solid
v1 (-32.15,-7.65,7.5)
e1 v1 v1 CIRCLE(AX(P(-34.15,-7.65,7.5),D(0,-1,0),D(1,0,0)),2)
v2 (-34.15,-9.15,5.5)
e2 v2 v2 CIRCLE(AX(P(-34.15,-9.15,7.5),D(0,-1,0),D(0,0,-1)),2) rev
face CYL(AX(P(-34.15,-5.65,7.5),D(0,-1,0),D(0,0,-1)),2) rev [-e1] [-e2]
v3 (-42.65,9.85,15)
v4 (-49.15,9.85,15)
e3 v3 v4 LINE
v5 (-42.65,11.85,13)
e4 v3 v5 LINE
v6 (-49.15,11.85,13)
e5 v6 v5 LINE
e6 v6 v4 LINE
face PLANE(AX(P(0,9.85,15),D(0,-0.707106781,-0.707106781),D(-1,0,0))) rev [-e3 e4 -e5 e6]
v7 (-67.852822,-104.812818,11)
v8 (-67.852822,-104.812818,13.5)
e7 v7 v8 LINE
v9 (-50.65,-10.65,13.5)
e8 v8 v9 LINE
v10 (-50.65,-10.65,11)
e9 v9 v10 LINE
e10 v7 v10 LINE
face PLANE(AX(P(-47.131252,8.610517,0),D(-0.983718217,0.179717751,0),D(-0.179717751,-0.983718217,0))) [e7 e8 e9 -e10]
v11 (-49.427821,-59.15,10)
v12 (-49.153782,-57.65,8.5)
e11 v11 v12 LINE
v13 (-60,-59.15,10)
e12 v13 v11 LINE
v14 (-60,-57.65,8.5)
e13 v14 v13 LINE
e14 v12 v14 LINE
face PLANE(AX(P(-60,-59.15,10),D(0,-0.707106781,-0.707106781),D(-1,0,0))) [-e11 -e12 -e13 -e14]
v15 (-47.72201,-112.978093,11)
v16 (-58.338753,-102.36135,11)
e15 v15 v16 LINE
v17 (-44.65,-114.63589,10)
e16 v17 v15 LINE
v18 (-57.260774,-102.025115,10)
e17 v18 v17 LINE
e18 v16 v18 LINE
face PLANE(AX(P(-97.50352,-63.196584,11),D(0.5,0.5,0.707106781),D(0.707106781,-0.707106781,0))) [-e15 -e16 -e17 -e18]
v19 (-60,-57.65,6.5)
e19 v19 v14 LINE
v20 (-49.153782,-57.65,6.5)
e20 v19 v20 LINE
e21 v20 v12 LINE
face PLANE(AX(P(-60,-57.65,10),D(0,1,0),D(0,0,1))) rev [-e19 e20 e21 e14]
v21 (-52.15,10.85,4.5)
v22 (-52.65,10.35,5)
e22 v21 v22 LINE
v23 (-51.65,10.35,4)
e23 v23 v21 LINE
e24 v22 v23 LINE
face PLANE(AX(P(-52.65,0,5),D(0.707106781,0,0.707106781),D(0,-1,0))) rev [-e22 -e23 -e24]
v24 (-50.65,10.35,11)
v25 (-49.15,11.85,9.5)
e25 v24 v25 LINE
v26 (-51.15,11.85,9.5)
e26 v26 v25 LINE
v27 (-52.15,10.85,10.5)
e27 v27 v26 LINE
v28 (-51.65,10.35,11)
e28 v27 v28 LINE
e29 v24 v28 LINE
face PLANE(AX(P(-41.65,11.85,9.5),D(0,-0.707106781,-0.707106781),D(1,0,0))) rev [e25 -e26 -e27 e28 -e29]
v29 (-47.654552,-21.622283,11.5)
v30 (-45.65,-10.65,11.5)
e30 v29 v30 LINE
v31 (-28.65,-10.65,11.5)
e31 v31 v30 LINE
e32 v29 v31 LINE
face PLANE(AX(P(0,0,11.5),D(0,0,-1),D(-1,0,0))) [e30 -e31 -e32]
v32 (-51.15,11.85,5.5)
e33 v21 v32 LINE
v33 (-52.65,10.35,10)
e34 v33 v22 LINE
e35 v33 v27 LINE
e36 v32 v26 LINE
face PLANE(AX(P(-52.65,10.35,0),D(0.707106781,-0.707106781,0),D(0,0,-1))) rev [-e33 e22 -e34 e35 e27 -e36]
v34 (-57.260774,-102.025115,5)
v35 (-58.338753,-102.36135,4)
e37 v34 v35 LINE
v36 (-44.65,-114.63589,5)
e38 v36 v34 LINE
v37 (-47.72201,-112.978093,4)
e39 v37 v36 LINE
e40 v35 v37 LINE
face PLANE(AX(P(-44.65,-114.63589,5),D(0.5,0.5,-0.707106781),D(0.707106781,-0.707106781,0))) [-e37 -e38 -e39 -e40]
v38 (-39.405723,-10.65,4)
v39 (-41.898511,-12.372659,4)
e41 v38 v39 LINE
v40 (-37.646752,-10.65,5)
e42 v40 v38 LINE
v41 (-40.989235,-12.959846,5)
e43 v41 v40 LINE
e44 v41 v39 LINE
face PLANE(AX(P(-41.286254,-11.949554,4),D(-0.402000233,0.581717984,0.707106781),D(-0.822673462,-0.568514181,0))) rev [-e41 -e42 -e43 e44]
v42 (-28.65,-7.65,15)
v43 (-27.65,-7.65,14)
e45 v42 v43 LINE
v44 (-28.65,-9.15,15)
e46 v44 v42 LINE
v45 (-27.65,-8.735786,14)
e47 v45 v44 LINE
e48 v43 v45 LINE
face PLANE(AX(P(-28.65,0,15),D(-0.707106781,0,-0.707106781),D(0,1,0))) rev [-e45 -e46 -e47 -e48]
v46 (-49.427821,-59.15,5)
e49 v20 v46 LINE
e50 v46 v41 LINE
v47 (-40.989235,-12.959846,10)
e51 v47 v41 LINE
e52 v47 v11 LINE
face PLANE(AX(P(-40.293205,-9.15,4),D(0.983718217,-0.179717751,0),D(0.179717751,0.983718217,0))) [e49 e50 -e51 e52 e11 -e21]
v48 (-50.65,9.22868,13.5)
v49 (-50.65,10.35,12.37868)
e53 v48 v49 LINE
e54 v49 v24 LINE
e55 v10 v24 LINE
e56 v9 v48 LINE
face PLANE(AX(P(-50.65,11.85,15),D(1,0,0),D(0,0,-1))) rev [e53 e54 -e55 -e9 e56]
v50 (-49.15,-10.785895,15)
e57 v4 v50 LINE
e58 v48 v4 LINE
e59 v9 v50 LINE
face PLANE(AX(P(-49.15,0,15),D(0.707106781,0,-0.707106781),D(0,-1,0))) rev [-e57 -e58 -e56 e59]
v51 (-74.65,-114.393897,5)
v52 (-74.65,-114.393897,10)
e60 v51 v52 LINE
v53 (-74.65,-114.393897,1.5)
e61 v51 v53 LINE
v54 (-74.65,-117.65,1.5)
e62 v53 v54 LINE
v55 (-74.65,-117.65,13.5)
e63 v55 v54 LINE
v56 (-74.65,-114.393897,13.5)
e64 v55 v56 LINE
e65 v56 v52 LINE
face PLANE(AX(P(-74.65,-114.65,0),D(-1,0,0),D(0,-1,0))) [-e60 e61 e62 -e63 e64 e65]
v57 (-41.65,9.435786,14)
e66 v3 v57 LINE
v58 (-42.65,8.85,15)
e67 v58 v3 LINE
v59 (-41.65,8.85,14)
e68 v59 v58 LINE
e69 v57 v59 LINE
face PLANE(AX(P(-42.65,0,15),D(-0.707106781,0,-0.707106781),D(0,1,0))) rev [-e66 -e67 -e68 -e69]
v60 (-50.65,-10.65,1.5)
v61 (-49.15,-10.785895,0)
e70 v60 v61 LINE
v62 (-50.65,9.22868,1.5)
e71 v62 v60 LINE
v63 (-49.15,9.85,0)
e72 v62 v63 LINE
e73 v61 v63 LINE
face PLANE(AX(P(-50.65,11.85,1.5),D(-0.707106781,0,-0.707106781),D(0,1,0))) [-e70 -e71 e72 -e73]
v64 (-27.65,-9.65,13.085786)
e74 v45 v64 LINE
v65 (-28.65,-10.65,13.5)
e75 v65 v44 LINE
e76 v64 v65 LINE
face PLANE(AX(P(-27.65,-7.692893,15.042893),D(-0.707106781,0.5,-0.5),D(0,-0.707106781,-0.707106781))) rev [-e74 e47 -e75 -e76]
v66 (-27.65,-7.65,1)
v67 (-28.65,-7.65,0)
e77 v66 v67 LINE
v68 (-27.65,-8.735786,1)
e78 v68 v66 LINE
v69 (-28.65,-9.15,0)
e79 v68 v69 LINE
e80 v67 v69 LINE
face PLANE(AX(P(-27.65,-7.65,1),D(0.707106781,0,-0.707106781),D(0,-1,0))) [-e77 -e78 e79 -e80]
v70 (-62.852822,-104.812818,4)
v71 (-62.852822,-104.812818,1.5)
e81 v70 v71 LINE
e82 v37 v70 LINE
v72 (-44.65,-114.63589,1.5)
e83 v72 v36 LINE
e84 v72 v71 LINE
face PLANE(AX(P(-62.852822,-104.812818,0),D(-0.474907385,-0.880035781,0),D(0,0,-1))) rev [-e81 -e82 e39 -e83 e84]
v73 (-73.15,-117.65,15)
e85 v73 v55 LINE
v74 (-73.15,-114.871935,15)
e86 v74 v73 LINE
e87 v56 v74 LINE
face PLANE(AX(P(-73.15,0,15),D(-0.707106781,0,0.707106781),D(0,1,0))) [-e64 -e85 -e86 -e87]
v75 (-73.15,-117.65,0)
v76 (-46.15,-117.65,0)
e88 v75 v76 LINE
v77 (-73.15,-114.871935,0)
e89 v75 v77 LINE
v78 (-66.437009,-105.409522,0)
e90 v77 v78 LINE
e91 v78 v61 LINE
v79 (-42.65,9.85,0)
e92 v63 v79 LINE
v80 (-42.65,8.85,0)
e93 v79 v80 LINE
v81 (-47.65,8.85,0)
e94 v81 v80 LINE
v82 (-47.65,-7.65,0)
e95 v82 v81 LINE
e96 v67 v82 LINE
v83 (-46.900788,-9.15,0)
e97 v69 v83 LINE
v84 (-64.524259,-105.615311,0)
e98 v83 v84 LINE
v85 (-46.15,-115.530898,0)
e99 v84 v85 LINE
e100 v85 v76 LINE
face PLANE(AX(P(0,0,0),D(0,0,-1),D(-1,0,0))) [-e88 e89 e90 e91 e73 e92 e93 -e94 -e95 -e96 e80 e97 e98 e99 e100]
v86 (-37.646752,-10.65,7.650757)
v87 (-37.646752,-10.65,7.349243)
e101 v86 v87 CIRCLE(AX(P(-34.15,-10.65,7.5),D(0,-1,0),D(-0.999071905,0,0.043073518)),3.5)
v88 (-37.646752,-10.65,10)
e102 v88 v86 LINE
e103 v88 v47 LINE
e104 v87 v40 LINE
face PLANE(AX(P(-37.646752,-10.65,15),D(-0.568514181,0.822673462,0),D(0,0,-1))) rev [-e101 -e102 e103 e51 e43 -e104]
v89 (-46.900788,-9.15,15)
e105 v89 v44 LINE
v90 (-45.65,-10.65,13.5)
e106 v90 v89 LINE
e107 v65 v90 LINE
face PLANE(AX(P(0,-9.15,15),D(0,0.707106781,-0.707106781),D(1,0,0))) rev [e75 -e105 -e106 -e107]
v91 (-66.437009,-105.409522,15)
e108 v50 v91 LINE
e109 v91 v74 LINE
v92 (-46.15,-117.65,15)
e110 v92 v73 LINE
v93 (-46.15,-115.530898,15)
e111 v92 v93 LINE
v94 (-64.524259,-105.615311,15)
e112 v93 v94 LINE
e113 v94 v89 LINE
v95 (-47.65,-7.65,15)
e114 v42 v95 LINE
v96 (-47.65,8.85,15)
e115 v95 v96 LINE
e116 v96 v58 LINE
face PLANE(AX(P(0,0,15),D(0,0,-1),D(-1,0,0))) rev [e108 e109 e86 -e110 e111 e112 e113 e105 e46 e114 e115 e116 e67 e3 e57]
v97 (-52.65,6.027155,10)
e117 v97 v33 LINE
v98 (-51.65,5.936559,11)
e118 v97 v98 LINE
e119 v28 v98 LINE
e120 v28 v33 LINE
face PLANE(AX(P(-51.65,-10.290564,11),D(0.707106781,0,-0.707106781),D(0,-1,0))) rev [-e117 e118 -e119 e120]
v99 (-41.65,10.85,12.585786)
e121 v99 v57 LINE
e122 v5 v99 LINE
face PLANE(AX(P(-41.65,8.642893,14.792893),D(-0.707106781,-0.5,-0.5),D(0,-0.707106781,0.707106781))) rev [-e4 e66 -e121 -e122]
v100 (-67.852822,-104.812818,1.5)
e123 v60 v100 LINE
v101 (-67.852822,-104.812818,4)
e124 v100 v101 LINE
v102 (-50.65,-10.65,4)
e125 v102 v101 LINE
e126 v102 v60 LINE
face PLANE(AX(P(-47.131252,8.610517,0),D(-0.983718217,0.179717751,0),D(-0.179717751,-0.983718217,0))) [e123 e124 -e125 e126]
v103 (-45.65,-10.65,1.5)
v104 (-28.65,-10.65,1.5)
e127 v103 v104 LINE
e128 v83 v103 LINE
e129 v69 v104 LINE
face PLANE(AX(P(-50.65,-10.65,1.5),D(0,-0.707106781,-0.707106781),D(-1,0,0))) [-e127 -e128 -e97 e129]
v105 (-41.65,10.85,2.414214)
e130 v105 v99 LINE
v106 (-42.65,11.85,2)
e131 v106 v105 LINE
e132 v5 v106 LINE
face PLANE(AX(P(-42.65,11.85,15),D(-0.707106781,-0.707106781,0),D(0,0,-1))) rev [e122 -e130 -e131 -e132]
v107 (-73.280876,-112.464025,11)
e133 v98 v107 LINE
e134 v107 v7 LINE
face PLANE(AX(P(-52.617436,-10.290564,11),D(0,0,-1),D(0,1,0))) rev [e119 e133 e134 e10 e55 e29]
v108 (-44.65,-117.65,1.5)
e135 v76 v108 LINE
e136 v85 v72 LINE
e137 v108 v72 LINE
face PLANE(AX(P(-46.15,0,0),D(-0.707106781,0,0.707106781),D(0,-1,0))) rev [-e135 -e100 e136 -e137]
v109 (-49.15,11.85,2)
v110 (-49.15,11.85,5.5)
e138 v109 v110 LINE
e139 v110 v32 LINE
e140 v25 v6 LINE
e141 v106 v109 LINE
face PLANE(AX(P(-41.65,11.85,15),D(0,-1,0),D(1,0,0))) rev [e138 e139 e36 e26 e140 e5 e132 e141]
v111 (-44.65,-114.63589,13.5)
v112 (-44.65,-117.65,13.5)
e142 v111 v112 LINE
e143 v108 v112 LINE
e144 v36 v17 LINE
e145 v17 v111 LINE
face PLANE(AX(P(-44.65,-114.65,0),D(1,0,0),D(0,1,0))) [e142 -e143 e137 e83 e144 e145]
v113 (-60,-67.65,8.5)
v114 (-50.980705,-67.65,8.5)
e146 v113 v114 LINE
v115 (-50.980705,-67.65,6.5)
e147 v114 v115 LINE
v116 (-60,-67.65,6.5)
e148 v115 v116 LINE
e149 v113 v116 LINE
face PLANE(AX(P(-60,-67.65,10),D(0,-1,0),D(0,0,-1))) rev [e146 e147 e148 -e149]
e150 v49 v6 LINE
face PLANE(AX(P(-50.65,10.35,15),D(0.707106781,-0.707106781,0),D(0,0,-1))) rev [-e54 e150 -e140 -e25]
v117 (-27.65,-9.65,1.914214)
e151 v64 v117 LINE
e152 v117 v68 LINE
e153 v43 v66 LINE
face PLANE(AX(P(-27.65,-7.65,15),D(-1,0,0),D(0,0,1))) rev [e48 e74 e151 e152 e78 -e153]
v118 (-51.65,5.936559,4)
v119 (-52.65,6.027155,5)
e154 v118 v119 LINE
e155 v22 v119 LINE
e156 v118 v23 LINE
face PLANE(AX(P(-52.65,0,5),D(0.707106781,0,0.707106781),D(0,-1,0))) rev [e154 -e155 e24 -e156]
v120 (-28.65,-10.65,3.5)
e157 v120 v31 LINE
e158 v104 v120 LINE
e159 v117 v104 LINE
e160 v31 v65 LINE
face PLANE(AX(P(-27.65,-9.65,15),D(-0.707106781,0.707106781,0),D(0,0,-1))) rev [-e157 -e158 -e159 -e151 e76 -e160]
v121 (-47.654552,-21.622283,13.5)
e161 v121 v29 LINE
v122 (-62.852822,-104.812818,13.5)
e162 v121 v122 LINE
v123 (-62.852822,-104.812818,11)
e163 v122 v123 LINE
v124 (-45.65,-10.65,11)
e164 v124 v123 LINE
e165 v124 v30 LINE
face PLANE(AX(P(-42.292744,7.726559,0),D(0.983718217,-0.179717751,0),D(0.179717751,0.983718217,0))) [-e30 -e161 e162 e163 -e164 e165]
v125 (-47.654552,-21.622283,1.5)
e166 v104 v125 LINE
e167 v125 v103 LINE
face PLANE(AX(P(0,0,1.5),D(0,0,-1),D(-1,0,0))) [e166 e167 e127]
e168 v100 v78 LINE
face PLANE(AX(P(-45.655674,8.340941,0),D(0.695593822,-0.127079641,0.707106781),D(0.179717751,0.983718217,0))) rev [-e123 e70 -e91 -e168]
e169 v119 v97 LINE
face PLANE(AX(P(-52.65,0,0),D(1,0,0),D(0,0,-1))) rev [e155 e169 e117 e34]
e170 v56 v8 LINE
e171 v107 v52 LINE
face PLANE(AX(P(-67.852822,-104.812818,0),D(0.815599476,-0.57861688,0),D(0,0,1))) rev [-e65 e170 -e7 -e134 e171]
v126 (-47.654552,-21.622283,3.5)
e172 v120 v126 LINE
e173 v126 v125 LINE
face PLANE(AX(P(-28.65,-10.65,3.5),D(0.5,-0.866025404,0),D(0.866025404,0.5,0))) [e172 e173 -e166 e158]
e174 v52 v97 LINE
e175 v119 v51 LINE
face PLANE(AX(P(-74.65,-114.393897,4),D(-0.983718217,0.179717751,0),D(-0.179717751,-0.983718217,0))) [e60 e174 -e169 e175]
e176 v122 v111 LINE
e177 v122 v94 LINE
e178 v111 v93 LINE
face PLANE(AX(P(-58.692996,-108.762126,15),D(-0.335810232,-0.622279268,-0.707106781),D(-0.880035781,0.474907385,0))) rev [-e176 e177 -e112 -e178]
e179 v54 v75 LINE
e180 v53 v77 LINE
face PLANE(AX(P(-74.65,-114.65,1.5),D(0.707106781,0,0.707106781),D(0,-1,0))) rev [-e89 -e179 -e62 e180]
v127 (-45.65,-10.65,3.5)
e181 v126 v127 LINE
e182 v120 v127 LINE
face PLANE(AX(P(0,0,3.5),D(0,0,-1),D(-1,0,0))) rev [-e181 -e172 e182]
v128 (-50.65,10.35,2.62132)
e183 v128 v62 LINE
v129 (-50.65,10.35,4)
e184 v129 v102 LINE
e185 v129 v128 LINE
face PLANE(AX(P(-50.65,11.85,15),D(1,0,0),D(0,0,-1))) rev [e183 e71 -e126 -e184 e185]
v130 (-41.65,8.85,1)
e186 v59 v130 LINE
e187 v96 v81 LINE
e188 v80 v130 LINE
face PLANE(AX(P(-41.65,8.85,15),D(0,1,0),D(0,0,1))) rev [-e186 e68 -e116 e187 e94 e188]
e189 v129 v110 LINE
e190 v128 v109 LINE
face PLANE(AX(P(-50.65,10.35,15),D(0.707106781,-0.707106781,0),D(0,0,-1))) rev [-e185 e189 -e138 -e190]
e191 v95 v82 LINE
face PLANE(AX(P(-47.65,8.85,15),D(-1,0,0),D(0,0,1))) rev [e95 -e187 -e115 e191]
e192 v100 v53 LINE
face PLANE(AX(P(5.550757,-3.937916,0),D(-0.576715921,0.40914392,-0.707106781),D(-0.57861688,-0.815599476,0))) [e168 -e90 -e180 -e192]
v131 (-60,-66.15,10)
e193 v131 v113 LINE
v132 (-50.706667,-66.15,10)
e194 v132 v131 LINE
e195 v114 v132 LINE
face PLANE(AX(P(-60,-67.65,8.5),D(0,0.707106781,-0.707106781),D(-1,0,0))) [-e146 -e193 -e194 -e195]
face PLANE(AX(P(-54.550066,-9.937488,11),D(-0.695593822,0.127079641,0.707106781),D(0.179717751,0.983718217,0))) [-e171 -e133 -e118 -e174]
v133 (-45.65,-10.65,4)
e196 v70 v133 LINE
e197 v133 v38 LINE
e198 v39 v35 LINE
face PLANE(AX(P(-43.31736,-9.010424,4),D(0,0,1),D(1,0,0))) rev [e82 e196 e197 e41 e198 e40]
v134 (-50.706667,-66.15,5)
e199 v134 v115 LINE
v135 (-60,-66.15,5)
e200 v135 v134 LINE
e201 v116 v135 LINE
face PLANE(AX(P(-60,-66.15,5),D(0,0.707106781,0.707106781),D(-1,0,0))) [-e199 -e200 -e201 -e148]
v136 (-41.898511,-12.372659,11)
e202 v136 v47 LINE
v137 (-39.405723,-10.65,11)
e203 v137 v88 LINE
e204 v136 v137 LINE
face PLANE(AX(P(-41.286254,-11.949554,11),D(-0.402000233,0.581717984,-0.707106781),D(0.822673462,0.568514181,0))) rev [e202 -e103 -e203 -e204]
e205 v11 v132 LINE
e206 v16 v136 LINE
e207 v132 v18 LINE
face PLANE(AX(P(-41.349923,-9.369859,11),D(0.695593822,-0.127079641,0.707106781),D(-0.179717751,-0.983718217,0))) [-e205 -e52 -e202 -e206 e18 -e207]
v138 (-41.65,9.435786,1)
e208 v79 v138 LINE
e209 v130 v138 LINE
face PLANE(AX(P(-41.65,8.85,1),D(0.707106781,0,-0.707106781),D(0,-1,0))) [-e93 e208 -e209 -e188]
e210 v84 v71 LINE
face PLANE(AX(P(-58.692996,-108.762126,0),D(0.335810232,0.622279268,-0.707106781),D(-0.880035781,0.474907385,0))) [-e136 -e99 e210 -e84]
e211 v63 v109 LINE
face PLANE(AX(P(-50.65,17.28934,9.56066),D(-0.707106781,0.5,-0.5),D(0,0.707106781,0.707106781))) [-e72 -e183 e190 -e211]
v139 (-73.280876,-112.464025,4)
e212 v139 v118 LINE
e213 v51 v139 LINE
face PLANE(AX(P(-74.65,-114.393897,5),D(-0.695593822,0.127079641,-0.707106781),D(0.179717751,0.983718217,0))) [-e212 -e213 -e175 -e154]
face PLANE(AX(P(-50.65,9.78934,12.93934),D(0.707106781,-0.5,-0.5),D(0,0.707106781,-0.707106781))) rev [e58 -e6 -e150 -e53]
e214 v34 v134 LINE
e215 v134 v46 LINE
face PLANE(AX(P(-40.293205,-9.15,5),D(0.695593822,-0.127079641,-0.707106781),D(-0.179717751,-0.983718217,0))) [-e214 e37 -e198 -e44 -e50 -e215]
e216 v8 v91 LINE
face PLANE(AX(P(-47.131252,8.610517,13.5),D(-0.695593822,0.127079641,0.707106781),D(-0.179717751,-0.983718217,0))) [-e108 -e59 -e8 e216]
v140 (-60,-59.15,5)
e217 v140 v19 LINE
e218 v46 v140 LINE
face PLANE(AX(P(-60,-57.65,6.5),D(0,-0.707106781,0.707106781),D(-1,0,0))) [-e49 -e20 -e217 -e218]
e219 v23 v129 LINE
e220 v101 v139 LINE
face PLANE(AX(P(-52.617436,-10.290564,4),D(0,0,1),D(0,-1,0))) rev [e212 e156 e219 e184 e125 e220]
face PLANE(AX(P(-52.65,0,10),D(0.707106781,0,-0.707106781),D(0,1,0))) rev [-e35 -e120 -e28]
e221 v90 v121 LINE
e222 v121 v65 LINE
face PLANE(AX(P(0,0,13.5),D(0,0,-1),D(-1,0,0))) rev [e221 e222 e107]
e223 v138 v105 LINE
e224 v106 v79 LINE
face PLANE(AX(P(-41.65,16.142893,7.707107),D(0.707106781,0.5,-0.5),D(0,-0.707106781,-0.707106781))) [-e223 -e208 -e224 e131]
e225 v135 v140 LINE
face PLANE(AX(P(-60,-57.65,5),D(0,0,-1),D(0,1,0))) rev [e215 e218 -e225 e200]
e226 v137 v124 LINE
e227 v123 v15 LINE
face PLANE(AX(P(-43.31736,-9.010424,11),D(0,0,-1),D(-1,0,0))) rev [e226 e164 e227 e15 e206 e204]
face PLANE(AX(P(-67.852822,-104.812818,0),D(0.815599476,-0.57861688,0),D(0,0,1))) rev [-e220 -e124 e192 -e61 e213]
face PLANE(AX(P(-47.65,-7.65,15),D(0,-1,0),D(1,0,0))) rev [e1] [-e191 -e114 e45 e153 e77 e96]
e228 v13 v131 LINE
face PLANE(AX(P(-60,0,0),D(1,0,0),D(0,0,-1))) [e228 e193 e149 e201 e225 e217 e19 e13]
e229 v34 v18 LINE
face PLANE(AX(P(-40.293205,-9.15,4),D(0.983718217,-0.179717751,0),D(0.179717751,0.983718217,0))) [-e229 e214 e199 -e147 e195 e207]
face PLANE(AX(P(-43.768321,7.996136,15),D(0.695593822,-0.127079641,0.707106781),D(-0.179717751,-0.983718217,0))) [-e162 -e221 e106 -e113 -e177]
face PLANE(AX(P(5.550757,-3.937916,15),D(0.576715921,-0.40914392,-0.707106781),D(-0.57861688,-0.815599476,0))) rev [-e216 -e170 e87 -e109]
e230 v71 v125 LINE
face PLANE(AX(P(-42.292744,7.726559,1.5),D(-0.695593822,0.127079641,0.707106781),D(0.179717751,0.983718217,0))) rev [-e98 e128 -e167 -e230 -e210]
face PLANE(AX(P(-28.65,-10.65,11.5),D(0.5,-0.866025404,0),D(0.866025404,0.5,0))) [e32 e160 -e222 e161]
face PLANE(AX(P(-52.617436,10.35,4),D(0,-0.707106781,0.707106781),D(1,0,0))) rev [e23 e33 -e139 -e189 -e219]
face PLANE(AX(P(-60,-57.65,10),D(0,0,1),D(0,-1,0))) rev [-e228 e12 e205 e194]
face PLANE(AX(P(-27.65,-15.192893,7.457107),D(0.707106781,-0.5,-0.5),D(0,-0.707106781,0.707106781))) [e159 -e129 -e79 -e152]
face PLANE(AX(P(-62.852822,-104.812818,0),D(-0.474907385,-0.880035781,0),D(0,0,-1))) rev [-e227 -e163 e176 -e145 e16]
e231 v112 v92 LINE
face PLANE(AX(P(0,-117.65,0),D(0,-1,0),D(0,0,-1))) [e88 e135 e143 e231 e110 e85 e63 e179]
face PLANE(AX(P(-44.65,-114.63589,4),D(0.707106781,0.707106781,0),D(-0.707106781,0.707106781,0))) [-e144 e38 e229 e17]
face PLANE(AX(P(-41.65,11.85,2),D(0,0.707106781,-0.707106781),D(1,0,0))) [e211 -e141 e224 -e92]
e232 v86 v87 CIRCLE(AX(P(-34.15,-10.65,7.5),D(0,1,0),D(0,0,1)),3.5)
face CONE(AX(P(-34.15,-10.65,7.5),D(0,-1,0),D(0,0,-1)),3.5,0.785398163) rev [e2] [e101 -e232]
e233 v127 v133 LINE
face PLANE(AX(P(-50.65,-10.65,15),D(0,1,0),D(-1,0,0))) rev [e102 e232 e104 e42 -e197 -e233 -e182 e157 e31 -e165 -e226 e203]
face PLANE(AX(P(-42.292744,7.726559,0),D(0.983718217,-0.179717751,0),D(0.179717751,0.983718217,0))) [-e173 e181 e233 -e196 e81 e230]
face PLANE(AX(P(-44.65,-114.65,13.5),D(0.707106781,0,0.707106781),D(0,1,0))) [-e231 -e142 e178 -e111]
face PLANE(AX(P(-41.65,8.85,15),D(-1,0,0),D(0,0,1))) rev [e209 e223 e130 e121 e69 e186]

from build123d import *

# Parameters (mm, degrees)
RESSALTO_EXTRUS_O1_DEPTH  = 15
ESBO_O7_W                 = 30
ESBO_O7_H                 = 15
RESSALTO_EXTRUS_O3_DEPTH  = 3
ESBO_O14_W                = 7
ESBO_O14_H                = 107.753429602
RESSALTO_EXTRUS_O5_DEPTH  = 2
ESBO_O15_W                = 7
ESBO_O15_H                = 107.852923352
RESSALTO_EXTRUS_O6_DEPTH  = 2
ESBO_O16_W                = 7
ESBO_O16_H                = 22.5
RESSALTO_EXTRUS_O9_DEPTH  = 2
CHANFRO11_SIZE            = 20.026147127
CHANFRO11_SIZE_2          = 10
CHANFRO12_SIZE            = 5.181688732
CHANFRO12_SIZE_2          = 10
CHANFRO13_SIZE            = 2
CHANFRO14_SIZE            = 4.8
CHANFRO14_SIZE2           = 5.970145796
CHANFRO16_SIZE            = 1.5
CHANFRO17_SIZE            = 1.5
CHANFRO18_SIZE            = 1
ESBO_O17_R                = 2
CORTE_EXTRUS_O1_DEPTH     = 5
CHANFRO20_SIZE            = 1
RESSALTO_EXTRUS_O10_DEPTH = 7
RESSALTO_EXTRUS_O11_DEPTH = 2
RESSALTO_EXTRUS_O13_DEPTH = 2
ESBO_O23_W                = 5
ESBO_O23_H                = 10
CORTE_EXTRUS_O2_DEPTH     = 60
CHANFRO22_SIZE            = 1.5
CHANFRO21_SIZE            = 1


# Some blends are built 0.0001 mm under size
with BuildPart() as part:
    # Esboço2 → Ressalto-extrusão1 (new body)
    with BuildSketch(Plane.XY):
        Polygon((-41.65, 8.85), (-41.65, 11.85), (-50.65, 11.85), (-50.65, -10.65), (-27.65, -10.65), (-27.65, -7.65), (-47.65, -7.65), (-47.65, 8.85), align=None)
    extrude(amount=RESSALTO_EXTRUS_O1_DEPTH)



with BuildPart() as body_2:
    # Esboço7 → Ressalto-extrusão3 (new body)
    with BuildSketch(Plane(origin=(0, -117.65, 0), x_dir=(-1, 0, 0), z_dir=(0, -1, 0))):
        with Locations((59.65, -7.5)):
            Rectangle(ESBO_O7_W, ESBO_O7_H)
    extrude(amount=-RESSALTO_EXTRUS_O3_DEPTH)


with BuildPart() as part_1:
    add(part.part)

    add(body_2.part)  # Loft3 merges body 2
    # Esboço9 → Loft3 section 0
    with BuildSketch(Plane(origin=(0, -114.65, 0), x_dir=(1, 0, 0), z_dir=(0, 1, 0))):
        with BuildLine():
            Line((-69.65, -15), (-64.65, -15))
            Line((-64.65, -15), (-64.65, 0))
            Line((-64.65, 0), (-69.65, 0))
            Line((-69.65, 0), (-69.65, -15))
        make_face()
    # Esboço8 → Loft3 section 1
    with BuildSketch(Plane.XZ.offset(10.65)):
        with BuildLine():
            Line((-50.65, 15), (-45.65, 15))
            Line((-45.65, 15), (-45.65, 0))
            Line((-45.65, 0), (-50.65, 0))
            Line((-50.65, 0), (-50.65, 15))
        make_face()
    loft()

    # Esboço14 → Ressalto-extrusão5 (add)
    with BuildSketch(Plane(origin=(-42.292744028, 7.726559005, 0), x_dir=(0, 0, -1), z_dir=(0.9837182167305484, -0.17971775113346497, 0))):
        with Locations((-7.5, -70.525331358)):
            Rectangle(ESBO_O14_W, ESBO_O14_H)
    extrude(amount=RESSALTO_EXTRUS_O5_DEPTH)

    # Esboço15 → Ressalto-extrusão6 (add)
    with BuildSketch(Plane(origin=(-47.131251678, 8.610517133, 0), x_dir=(0, 0, 1), z_dir=(-0.9837182167305483, 0.17971775113346522, 0))):
        with Locations((7.5, -73.505764779)):
            Rectangle(ESBO_O15_W, ESBO_O15_H)
    extrude(amount=RESSALTO_EXTRUS_O6_DEPTH)

    # Esboço16 → Ressalto-extrusão9 (add)
    with BuildSketch(Plane.ZY.offset(50.65)):
        with Locations((7.5, 0.6)):
            Rectangle(ESBO_O16_W, ESBO_O16_H)
    extrude(amount=RESSALTO_EXTRUS_O9_DEPTH)

    # Chanfro11
    # the kernel refuses this chamfer: 20.026147127, 10 mm, written as the material it adds along each edge
    with BuildSketch(Plane(origin=(-64.65, -114.65, 55.83646579), x_dir=(0.9998316750706326, -0.018347248443652868, 0), z_dir=(0, 0, -1))) as chanfro11_piece_1_section:
        Polygon((CHANFRO11_SIZE * 0.999831675085, -CHANFRO11_SIZE * 0.0183472484439), (CHANFRO11_SIZE_2 * 0.161638977635, -CHANFRO11_SIZE_2 * 0.986849958661), (0, 0), align=None)
    chanfro11_piece_1 = extrude(amount=55.83646579, mode=Mode.PRIVATE)
    chanfro11_piece_1 = split(chanfro11_piece_1, bisect_by=Plane(origin=(-44.65, -111.70383057, 13), z_dir=(-1, 0, 0)), keep=Keep.TOP, mode=Mode.PRIVATE)
    chanfro11_piece_1 = split(chanfro11_piece_1, bisect_by=Plane(origin=(-56.081001228, -111.70383057, 15), z_dir=(0, 0, -1)), keep=Keep.TOP, mode=Mode.PRIVATE)
    add(chanfro11_piece_1)

    # Chanfro12
    # the kernel refuses this chamfer: 10, 5.181688732 mm, written as the material it adds along each edge
    with BuildSketch(Plane(origin=(-69.65, -114.65, -14.909754714), x_dir=(-0.9981888061534079, -0.06015901653147684, 0), z_dir=(0, 0, 1))) as chanfro12_piece_1_section:
        Polygon((CHANFRO12_SIZE * 0.99818880622, -CHANFRO12_SIZE * 0.0601590165355), (-CHANFRO12_SIZE_2 * 0.238571767911, -CHANFRO12_SIZE_2 * 0.971124869188), (0, 0), align=None)
    chanfro12_piece_1 = extrude(amount=29.909754714, mode=Mode.PRIVATE)
    chanfro12_piece_1 = split(chanfro12_piece_1, bisect_by=Plane(origin=(-74.65, -111.318186465, 5.5), z_dir=(1, 0, 0)), keep=Keep.TOP, mode=Mode.PRIVATE)
    chanfro12_piece_1 = split(chanfro12_piece_1, bisect_by=Plane(origin=(-70.664221075, -111.318186465, 0), z_dir=(0, 0, 1)), keep=Keep.TOP, mode=Mode.PRIVATE)
    add(chanfro12_piece_1)

    # Chanfro13
    chanfro13_edges = [part_1.edges().sort_by_distance(p)[0] for p in [
        (-46.15, 11.85, 15),
        (-46.15, 11.85, 0),
    ]]
    chamfer(chanfro13_edges, length=CHANFRO13_SIZE)

    # Chanfro14
    chanfro14_edges = [part_1.edges().sort_by_distance(p)[0] for p in [
        (-43.616897465, -10.65, 7.5),
    ]]
    chanfro14_side = [part_1.faces().sort_by_distance(p)[0] for p in [
        (-52.309535597, -58.230756092, 7.5),
    ]]
    chamfer(chanfro14_edges, length=CHANFRO14_SIZE, length2=CHANFRO14_SIZE2, reference=chanfro14_side[0])

    # Chanfro16
    chanfro16_edges = [part_1.edges().sort_by_distance(p)[0] for p in [
        (-50.65, 11.85, 3),
        (-51.65, 11.85, 11),
        (-51.65, 11.85, 4),
        (-52.65, 11.85, 7.5),
        (-54.251411244, -57.731408916, 0),
        (-54.251411244, -57.731408916, 15),
        (-53.751411244, -109.724353826, 0),
        (-53.751411244, -109.724353826, 15),
        (-59.251411244, -57.731408916, 15),
        (-59.251411244, -57.731408916, 0),
        (-71.251411244, -109.603357662, 15),
        (-71.251411244, -109.603357662, 0),
        (-50.65, 11.85, 12),
        (-50.65, -0.4, 0),
        (-50.65, 10.85, 1),
        (-50.65, -0.4, 15),
        (-50.65, 10.85, 14),
        (-74.65, -116.021948745, 0),
        (-74.65, -116.021948745, 15),
        (-44.65, -116.14294491, 15),
        (-44.65, -116.14294491, 0),
    ]]
    chamfer(chanfro16_edges, length=CHANFRO16_SIZE)

    # Chanfro17
    chanfro17_edges = [part_1.edges().sort_by_distance(p)[0] for p in [
        (-37.412413451, -10.65, 0),
        (-37.412413451, -10.65, 15),
    ]]
    chamfer(chanfro17_edges, length=CHANFRO17_SIZE)

    # Chanfro18
    chanfro18_edges = [part_1.edges().sort_by_distance(p)[0] for p in [
        (-61.620535422, -59.570685278, 4),
        (-52.65, -0.059403589, 11),
        (-52.7408582, -60.591679812, 4),
        (-61.620535422, -59.570685278, 11),
        (-52.7408582, -60.591679812, 11),
        (-41.06314717, -13.01092372, 4),
        (-41.06314717, -13.01092372, 11),
        (-52.65, -0.059403589, 4),
    ]]
    chamfer(chanfro18_edges, length=CHANFRO18_SIZE)

    # Esboço17 → Corte-extrusão1 (cut)
    with BuildSketch(Plane.XZ.offset(10.65)):
        with Locations(Location((-34.15, 7.5, 0), (0, 0, 270))):
            Circle(ESBO_O17_R)
    extrude(amount=-CORTE_EXTRUS_O1_DEPTH, mode=Mode.SUBTRACT)

    # Chanfro20
    chanfro20_edges = [part_1.edges().sort_by_distance(p)[0] for p in [
        (-41.65, 11.85, 7.5),
        (-41.65, 10.85, 14),
        (-41.65, 10.85, 1),
        (-41.65, 9.35, 15),
        (-27.65, -10.65, 7.5),
        (-27.65, -8.4, 0),
        (-27.65, -8.4, 15),
        (-27.65, -9.9, 14.25),
        (-27.65, -9.9, 0.75),
        (-41.65, 9.35, 0),
    ]]
    chamfer(chanfro20_edges, length=CHANFRO20_SIZE)

    # Esboço18 → Ressalto-extrusão10 (add)
    with BuildSketch(Plane.XY.offset(11)):
        Polygon((-44.65, -114.635889819), (-57.26077437, -102.025115449), (-40.293205201, -9.15), (-44.359410271, -9.15), (-60.698866461, -98.587023358), (-61.558389484, -97.727500335), (-67.574940752, -97.727500335), (-51.65, -10.559403589), (-51.65, 10.35), (-52.65, 10.35), (-52.65, 6.027155141), (-74.65, -114.393897491), (-64.647422179, -114.635889819), align=None)
    extrude(amount=-RESSALTO_EXTRUS_O10_DEPTH)

    # Esboço19 → Ressalto-extrusão11 (add)
    with BuildSketch(Plane(origin=(0, 0, 1.5), x_dir=(-1, 0, 0), z_dir=(0, 0, -1))):
        Polygon((28.65, -10.65), (49.35917828, -22.606449655), (46.90078844, -9.15), (46.90078844, -7.65), (28.65, -7.65), align=None)
    extrude(amount=-RESSALTO_EXTRUS_O11_DEPTH)

    # Esboço21 → Ressalto-extrusão13 (add)
    with BuildSketch(Plane.XY.offset(13.5)):
        Polygon((-28.65, -10.65), (-49.35917828, -22.606449655), (-46.90078844, -9.15), (-46.90078844, -7.65), (-28.65, -7.65), align=None)
    extrude(amount=-RESSALTO_EXTRUS_O13_DEPTH)

    # Esboço23 → Corte-extrusão2 (cut)
    with BuildSketch(Plane(origin=(0, 0, 0), x_dir=(0, 0, -1), z_dir=(1, 0, 0))):
        with Locations((-7.5, -62.65)):
            Rectangle(ESBO_O23_W, ESBO_O23_H)
    extrude(amount=-CORTE_EXTRUS_O2_DEPTH, mode=Mode.SUBTRACT)

    # Chanfro22
    chanfro22_edges = [part_1.edges().sort_by_distance(p)[0] for p in [
        (-55.490352601, -67.65, 10),
        (-54.576891062, -57.65, 10),
        (-54.576891062, -57.65, 5),
        (-55.490352601, -67.65, 5),
    ]]
    chamfer(chanfro22_edges, length=CHANFRO22_SIZE)

    # Chanfro21
    chanfro21_edges = [part_1.edges().sort_by_distance(p)[0] for p in [
        (-50.955387185, -108.330502634, 11),
        (-50.955387185, -108.330502634, 4),
        (-48.997924928, -56.796886925, 11),
        (-48.997924928, -56.796886925, 4),
        (-52.65, 8.18857757, 4),
        (-63.65, -54.183371175, 11),
        (-63.65, -54.183371175, 4),
        (-52.65, 8.18857757, 11),
    ]]
    chamfer(chanfro21_edges, length=CHANFRO21_SIZE - 0.0001)  # a hair under: the kernel refuses the full size

    # Esboço26 → Corte-Revolução1 (revolve, cut)
    with BuildSketch(Plane.XY.offset(7.5), mode=Mode.PRIVATE) as corte_revolu_o1_sk:
        Polygon((-30.65, -11.703246541), (-30.65, -10.65), (-34.15, -7.15), (-34.15, -10.65), (-34.15, -11.703246541), align=None)
    revolve(corte_revolu_o1_sk.sketch.rotate(Axis((-34.15, -7.15, 7.5), (0, -1, 0)), 270), axis=Axis((-34.15, -7.15, 7.5), (0, -1, 0)), mode=Mode.SUBTRACT)


solid = part_1.part
